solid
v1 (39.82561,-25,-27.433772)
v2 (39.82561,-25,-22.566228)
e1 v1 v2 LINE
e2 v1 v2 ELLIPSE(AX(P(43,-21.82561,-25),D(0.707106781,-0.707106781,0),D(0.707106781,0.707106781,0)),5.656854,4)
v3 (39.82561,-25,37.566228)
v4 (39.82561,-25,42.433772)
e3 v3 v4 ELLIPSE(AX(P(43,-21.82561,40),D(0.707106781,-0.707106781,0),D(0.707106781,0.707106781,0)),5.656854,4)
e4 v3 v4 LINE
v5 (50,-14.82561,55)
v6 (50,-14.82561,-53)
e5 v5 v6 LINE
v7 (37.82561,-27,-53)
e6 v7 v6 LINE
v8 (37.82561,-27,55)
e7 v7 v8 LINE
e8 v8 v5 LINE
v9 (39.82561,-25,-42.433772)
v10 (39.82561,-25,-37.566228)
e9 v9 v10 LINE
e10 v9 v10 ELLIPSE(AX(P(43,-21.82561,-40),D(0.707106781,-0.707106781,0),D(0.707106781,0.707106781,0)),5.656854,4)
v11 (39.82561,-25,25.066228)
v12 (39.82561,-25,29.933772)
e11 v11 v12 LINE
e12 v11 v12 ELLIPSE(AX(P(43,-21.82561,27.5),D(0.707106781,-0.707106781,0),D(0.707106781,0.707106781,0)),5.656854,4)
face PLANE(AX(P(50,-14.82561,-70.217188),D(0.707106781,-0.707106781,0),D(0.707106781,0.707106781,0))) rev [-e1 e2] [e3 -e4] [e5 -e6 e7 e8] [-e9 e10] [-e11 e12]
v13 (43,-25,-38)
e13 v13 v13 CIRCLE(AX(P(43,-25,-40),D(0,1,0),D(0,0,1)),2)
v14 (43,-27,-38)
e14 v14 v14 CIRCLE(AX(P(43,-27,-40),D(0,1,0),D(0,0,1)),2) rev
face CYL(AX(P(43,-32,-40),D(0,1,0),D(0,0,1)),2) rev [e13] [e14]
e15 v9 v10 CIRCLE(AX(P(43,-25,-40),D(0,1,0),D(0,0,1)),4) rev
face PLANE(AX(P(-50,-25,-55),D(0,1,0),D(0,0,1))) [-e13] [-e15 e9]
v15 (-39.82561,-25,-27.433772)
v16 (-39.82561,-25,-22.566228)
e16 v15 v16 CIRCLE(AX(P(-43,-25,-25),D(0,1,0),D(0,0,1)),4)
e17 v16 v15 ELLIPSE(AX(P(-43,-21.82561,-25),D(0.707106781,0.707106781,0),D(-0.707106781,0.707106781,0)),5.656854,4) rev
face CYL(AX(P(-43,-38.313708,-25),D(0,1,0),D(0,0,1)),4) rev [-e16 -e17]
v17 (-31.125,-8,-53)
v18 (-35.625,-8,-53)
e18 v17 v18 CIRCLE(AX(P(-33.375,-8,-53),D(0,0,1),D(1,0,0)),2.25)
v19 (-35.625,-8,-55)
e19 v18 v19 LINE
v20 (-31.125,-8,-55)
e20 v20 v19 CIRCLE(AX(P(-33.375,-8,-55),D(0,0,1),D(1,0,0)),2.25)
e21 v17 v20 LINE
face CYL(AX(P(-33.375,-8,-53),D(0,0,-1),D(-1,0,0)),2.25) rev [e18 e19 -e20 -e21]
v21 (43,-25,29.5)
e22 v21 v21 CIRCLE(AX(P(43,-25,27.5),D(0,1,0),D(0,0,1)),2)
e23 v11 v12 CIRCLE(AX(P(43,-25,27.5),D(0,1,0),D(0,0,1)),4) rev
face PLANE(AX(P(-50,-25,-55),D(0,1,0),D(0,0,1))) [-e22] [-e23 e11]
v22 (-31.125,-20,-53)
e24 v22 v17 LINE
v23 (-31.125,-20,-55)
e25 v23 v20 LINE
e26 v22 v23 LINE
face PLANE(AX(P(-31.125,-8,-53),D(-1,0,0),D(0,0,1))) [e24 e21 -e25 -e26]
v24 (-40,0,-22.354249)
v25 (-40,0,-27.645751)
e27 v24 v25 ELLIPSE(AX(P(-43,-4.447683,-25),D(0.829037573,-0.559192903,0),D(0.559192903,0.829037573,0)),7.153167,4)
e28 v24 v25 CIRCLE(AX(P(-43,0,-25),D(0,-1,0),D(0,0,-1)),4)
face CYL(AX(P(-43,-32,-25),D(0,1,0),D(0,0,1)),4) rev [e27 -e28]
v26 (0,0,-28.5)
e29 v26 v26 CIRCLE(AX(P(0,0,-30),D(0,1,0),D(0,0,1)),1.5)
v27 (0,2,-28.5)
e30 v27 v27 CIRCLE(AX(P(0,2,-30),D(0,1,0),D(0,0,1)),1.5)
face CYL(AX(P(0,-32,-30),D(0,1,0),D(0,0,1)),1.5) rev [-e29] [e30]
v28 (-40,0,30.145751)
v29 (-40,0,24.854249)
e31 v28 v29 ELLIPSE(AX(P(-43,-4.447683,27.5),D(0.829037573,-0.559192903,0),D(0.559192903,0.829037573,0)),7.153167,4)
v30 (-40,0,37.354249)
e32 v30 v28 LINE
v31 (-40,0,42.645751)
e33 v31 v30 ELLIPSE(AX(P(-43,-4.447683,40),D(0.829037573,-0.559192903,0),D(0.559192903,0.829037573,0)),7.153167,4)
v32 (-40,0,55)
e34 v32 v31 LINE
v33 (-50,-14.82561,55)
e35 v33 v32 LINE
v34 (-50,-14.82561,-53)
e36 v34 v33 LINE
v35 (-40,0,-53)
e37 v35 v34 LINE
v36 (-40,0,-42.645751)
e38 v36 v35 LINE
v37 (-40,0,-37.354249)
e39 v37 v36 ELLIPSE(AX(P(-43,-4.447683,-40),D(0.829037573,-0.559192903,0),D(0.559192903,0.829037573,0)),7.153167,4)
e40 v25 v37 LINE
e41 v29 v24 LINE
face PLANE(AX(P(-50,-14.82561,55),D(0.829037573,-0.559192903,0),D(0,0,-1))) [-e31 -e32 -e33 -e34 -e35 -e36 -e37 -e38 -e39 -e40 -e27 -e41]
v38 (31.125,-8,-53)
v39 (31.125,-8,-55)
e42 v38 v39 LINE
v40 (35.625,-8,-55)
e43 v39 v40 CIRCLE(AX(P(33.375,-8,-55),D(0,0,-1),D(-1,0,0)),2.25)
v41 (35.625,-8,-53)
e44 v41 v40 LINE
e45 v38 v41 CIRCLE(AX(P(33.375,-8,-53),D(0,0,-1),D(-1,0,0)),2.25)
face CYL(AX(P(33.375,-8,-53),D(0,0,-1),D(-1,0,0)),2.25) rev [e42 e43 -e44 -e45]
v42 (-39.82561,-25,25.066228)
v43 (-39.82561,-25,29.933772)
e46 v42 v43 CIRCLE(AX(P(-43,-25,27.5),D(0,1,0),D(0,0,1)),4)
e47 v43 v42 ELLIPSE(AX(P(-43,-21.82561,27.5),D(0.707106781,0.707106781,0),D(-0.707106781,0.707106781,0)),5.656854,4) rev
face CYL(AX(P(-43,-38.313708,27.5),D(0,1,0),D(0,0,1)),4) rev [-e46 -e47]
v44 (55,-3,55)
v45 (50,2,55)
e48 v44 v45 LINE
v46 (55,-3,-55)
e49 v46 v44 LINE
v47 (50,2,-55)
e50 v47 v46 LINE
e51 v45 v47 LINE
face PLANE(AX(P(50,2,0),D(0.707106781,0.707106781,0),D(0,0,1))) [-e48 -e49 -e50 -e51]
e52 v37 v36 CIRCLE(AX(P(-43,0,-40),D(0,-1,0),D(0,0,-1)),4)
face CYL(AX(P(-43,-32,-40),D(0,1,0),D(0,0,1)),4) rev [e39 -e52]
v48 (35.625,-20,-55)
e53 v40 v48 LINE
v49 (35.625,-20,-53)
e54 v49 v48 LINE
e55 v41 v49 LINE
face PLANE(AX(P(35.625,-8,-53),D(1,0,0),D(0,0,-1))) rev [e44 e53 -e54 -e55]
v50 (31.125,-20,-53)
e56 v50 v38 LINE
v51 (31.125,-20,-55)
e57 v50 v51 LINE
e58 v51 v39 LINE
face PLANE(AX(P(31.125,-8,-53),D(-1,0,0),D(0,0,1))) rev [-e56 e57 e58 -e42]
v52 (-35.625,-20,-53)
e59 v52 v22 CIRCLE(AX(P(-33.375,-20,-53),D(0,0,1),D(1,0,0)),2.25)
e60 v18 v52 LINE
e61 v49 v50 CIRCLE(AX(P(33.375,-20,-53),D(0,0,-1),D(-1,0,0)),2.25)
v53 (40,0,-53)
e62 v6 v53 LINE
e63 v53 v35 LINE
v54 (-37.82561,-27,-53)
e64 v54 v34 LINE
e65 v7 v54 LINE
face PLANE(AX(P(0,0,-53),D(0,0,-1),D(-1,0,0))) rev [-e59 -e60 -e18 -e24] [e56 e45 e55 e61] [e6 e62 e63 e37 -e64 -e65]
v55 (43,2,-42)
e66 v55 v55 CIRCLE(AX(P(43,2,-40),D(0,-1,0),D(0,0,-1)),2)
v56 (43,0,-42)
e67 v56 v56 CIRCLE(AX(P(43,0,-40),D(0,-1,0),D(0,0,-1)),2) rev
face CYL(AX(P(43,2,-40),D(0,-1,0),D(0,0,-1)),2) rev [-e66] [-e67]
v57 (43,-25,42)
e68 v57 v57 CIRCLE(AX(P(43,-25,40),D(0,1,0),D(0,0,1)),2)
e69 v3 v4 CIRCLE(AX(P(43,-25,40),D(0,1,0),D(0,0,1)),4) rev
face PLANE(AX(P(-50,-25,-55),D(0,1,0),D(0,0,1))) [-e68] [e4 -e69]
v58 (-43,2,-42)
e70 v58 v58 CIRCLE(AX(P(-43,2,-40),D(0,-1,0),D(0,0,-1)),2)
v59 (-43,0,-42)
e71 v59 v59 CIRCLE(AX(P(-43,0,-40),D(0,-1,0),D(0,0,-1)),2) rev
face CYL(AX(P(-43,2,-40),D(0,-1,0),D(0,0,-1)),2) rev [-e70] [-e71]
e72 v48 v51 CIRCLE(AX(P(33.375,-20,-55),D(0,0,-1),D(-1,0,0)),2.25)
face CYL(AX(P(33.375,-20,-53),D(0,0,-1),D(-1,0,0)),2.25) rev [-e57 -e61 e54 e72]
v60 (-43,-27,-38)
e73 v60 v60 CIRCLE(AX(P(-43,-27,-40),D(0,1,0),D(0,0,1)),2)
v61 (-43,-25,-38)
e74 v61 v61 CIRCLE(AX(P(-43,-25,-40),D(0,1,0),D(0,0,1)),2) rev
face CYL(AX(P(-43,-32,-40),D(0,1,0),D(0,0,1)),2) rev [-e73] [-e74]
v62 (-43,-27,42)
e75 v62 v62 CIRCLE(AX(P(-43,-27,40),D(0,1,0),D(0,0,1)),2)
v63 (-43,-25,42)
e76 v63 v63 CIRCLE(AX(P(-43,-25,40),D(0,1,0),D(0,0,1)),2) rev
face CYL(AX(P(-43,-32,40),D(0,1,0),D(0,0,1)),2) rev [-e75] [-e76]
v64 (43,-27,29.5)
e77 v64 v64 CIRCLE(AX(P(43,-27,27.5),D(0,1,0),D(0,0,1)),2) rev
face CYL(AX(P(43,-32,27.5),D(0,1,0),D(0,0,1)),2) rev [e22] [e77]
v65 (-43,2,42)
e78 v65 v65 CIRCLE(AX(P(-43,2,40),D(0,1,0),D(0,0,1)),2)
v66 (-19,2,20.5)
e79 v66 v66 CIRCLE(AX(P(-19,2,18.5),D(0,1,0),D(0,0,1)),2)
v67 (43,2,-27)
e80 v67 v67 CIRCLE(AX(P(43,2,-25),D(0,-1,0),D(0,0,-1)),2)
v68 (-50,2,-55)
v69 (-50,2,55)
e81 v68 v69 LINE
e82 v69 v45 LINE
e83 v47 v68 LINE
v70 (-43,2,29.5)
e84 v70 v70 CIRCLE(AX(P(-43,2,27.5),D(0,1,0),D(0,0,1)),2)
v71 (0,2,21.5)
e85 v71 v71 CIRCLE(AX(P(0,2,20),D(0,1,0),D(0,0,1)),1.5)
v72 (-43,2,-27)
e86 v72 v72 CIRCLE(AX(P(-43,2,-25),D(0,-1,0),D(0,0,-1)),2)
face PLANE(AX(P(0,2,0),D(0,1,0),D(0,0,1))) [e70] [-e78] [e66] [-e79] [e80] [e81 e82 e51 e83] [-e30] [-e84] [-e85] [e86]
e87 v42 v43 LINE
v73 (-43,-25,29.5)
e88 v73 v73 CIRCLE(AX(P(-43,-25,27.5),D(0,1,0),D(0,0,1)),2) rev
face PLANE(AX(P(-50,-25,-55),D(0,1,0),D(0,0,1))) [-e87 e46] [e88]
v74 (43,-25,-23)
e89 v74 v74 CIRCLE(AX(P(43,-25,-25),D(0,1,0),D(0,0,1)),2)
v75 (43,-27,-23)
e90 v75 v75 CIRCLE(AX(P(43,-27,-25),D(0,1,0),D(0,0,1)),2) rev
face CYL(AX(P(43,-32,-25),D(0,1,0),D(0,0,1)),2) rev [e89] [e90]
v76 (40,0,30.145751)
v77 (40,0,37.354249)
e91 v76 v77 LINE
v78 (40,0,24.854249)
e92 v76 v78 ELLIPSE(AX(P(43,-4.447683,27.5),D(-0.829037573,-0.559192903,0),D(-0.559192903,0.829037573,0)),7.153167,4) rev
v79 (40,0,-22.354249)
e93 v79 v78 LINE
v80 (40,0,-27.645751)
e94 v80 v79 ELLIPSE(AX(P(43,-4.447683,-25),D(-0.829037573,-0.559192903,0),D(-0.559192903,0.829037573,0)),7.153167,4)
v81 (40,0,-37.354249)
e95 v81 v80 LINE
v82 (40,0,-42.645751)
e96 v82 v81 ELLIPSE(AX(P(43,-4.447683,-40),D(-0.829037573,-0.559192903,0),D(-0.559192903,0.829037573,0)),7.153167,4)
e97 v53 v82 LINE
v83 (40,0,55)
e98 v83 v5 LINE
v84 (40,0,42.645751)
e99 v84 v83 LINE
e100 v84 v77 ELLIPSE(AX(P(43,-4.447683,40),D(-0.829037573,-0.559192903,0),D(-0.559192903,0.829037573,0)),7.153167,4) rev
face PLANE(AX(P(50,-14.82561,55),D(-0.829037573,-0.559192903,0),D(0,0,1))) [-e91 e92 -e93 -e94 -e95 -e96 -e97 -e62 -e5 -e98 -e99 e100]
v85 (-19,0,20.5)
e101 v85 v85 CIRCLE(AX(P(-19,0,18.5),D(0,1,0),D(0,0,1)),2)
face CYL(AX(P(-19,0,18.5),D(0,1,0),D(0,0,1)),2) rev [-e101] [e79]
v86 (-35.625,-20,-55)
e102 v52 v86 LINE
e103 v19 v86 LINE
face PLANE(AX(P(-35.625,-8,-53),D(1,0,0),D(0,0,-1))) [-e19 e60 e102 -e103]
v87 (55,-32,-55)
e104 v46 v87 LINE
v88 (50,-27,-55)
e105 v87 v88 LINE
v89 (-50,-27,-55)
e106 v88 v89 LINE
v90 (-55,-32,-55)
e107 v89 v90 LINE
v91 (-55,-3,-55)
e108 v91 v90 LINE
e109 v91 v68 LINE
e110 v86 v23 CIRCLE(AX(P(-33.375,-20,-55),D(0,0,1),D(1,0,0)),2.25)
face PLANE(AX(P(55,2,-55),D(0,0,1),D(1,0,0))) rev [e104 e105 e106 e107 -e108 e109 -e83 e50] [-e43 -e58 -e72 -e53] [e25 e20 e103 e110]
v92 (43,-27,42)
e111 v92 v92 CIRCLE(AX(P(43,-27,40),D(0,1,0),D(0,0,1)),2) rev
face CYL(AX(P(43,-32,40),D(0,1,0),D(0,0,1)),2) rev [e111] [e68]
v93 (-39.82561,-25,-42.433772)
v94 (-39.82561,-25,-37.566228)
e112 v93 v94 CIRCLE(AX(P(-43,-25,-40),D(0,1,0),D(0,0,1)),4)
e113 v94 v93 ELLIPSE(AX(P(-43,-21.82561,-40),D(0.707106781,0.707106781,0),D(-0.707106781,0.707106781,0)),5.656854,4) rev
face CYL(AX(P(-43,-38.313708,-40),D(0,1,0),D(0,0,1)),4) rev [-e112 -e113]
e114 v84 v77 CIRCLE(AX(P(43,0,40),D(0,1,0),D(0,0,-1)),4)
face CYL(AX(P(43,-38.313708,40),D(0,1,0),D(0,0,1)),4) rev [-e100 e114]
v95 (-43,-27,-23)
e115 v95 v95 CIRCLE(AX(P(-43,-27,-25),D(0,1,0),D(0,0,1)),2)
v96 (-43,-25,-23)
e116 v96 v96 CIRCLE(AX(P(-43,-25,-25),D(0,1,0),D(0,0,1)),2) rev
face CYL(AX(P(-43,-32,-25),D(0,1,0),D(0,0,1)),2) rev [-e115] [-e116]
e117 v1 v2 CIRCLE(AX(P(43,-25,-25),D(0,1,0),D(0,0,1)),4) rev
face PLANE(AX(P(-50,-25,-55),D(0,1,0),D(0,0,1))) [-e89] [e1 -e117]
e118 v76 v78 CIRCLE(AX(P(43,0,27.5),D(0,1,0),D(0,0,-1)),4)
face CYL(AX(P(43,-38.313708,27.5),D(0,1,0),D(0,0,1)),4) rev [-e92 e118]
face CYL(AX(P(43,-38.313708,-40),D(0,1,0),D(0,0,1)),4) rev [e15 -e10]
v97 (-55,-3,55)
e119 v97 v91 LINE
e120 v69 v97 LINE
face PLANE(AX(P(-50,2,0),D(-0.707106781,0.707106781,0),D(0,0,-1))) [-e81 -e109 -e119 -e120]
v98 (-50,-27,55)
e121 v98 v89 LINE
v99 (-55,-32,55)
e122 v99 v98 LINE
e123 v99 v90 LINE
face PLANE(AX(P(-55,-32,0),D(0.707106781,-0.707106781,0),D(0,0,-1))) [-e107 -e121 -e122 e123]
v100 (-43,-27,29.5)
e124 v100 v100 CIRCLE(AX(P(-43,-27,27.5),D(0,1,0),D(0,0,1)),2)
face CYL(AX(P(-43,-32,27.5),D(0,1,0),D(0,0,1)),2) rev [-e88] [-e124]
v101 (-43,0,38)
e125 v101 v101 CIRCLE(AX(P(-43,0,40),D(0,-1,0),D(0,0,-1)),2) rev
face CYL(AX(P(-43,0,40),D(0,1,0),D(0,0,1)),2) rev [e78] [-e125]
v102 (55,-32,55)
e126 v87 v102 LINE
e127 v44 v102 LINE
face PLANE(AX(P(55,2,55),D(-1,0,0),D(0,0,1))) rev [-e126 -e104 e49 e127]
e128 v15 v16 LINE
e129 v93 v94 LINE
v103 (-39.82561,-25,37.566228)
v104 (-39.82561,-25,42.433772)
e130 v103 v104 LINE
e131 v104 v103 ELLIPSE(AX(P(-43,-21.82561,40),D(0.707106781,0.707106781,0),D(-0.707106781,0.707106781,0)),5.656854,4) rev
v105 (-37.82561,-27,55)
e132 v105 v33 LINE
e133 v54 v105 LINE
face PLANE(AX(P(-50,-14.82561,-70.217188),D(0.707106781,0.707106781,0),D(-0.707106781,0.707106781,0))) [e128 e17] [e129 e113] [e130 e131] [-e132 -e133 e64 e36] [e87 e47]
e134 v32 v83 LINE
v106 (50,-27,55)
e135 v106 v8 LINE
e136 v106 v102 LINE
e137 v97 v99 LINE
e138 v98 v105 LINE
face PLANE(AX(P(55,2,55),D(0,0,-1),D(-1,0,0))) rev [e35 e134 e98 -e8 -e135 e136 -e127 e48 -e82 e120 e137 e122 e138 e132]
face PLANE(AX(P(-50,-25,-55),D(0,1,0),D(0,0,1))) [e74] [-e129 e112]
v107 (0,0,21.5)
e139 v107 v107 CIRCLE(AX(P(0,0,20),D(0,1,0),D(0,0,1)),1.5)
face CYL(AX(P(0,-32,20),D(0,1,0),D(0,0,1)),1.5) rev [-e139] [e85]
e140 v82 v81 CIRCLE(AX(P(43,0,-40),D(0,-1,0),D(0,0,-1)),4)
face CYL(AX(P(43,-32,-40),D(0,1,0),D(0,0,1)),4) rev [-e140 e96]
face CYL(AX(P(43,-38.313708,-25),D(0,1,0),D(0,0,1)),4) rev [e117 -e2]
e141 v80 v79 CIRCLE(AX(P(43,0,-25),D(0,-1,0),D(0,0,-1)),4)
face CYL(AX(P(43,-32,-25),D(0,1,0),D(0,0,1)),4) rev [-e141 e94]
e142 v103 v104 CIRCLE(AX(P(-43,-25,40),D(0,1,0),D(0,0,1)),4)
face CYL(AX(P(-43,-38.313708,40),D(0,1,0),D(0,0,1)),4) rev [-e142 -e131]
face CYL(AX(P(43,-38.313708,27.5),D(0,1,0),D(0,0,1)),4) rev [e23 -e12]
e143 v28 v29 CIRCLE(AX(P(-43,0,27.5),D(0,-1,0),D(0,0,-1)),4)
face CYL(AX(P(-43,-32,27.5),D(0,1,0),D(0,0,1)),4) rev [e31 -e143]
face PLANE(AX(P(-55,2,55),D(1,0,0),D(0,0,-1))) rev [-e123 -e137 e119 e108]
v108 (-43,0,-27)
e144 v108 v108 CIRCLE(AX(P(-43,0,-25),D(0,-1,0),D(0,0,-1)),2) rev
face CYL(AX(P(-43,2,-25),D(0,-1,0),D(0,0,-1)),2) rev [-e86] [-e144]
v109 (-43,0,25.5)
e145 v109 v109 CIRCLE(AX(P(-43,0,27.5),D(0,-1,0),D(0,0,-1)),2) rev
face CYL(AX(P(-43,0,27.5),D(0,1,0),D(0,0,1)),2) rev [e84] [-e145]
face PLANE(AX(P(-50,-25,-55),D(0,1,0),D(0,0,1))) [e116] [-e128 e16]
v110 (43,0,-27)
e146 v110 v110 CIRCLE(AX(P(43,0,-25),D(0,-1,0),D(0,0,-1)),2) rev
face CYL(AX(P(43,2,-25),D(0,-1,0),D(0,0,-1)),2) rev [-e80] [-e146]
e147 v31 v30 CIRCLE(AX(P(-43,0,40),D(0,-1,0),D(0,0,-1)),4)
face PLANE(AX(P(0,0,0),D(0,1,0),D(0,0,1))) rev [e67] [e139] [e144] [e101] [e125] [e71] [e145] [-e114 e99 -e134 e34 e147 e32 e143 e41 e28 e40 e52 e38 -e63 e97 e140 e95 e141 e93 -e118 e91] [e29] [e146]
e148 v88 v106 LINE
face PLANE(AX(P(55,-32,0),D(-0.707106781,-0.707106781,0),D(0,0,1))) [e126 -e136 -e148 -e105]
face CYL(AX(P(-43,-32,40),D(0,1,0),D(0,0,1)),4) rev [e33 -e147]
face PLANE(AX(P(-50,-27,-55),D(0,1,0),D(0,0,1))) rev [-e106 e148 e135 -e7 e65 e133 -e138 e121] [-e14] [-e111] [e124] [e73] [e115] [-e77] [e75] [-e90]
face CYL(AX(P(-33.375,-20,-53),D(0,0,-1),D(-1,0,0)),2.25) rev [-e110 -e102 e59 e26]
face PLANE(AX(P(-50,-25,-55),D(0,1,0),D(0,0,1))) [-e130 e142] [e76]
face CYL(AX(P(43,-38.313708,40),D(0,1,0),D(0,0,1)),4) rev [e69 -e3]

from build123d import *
from build123d.topology import SkipClean

# Parameters (mm, degrees)
SKETCH1_W           = 110
SKETCH1_H           = 110
BOSS_EXTRUDE1_DEPTH = 2
SKETCH2_R           = 2
CUT_EXTRUDE1_DEPTH  = 78.807454656
SKETCH3_W           = 5
SKETCH3_H           = 110
BOSS_EXTRUDE2_DEPTH = 32
SKETCH4_R           = 1.5
CUT_EXTRUDE2_DEPTH  = 85.888161719
SKETCH5_R           = 2
CUT_EXTRUDE3_DEPTH  = 85.107074613
CHAMFER1_SIZE       = 14.825609685
CHAMFER1_SIZE_2     = 10
SKETCH6_R           = 4
CUT_EXTRUDE4_DEPTH  = 85.107074613
CHAMFER2_SIZE       = 5
BOSS_EXTRUDE3_DEPTH = 2
CUT_EXTRUDE5_DEPTH  = 2
CHAMFER3_SIZE       = 5
CUT_EXTRUDE6_DEPTH  = 2
BOSS_EXTRUDE4_DEPTH = 108
SKETCH12_R          = 2
CUT_EXTRUDE7_DEPTH  = 85.107074613
SKETCH13_R          = 4
CUT_EXTRUDE8_DEPTH  = 25


# Some blends are built 0.0001 mm under size
with BuildPart() as part:
    # Sketch1 → Boss-Extrude1 (new body)
    with BuildSketch(Plane(origin=(0, 0, 0), x_dir=(1, 0, 0), z_dir=(0, 1, 0))):
        Rectangle(SKETCH1_W, SKETCH1_H)
    extrude(amount=BOSS_EXTRUDE1_DEPTH)

    # Sketch2 → Cut-Extrude1 (cut, through all)
    with BuildSketch(Plane(origin=(0, 2, 0), x_dir=(1, 0, 0), z_dir=(0, 1, 0))):
        with Locations(Location((-43, -40, 0), (0, 0, 270))):
            Circle(SKETCH2_R)
        with Locations(Location((-43, -27.5, 0), (0, 0, 270))):
            Circle(SKETCH2_R)
        with Locations(Location((-19, -18.5, 0), (0, 0, 270))):
            Circle(SKETCH2_R)
    extrude(amount=-CUT_EXTRUDE1_DEPTH, mode=Mode.SUBTRACT)

    # Sketch3 → Boss-Extrude2 (add)
    with BuildSketch(Plane.XZ):
        with Locations((-52.5, 0)):
            Rectangle(SKETCH3_W, SKETCH3_H)
        with Locations((52.5, 0)):
            Rectangle(SKETCH3_W, SKETCH3_H)
    extrude(amount=BOSS_EXTRUDE2_DEPTH)

    # Sketch4 → Cut-Extrude2 (cut, through all)
    with BuildSketch(Plane(origin=(0, 2, 0), x_dir=(1, 0, 0), z_dir=(0, 1, 0))):
        with Locations(Location((0, 30, 0), (0, 0, 270))):
            Circle(SKETCH4_R)
        with Locations(Location((0, -20, 0), (0, 0, 270))):
            Circle(SKETCH4_R)
    extrude(amount=-CUT_EXTRUDE2_DEPTH, mode=Mode.SUBTRACT)

    # Sketch5 → Cut-Extrude3 (cut, through all)
    with BuildSketch(Plane.XZ):
        with Locations(Location((-43, -25, 0), (0, 0, 270))):
            Circle(SKETCH5_R)
        with Locations(Location((-43, -40, 0), (0, 0, 270))):
            Circle(SKETCH5_R)
        with Locations(Location((43, -25, 0), (0, 0, 270))):
            Circle(SKETCH5_R)
        with Locations(Location((43, -40, 0), (0, 0, 270))):
            Circle(SKETCH5_R)
    extrude(amount=-CUT_EXTRUDE3_DEPTH, mode=Mode.SUBTRACT)

    # Chamfer1
    # the kernel refuses this chamfer: 14.825609685, 10 mm, written as the material it adds along each edge
    with BuildSketch(Plane(origin=(-50, 0, 55), x_dir=(-0.021644705014774085, -0.9997657259302418, 0), z_dir=(0, 0, -1))) as chamfer1_piece_1_section:
        Polygon((CHAMFER1_SIZE * 0.999765725939, -CHAMFER1_SIZE * 0.021644705015), (-CHAMFER1_SIZE_2 * 0.0216447050148, -CHAMFER1_SIZE_2 * 0.99976572593), (0, 0), align=None)
    chamfer1_piece_1 = extrude(amount=110, mode=Mode.PRIVATE)
    chamfer1_piece_1 = chamfer1_piece_1 - Plane(origin=(-43, -5.019728398, 40), x_dir=(0, 0, 1), z_dir=(0, 1, 0)) * Cylinder(2, 280, mode=Mode.PRIVATE)
    chamfer1_piece_1 = chamfer1_piece_1 - Plane(origin=(-43, -5.019728398, 27.5), x_dir=(0, 0, 1), z_dir=(0, 1, 0)) * Cylinder(2, 280, mode=Mode.PRIVATE)
    chamfer1_piece_1 = chamfer1_piece_1 - Plane(origin=(-43, -5.019728398, -25), x_dir=(0, 0, -1), z_dir=(0, -1, 0)) * Cylinder(2, 280, mode=Mode.PRIVATE)
    chamfer1_piece_1 = chamfer1_piece_1 - Plane(origin=(-43, -5.019728398, -40), x_dir=(0, 0, -1), z_dir=(0, -1, 0)) * Cylinder(2, 280, mode=Mode.PRIVATE)
    add(chamfer1_piece_1)
    with BuildSketch(Plane(origin=(50, 0, 55), x_dir=(-0.9988697089125116, 0.04753214298802855, 0), z_dir=(0, 0, -1))) as chamfer1_piece_2_section:
        Polygon((CHAMFER1_SIZE_2 * 0.998869708913, -CHAMFER1_SIZE_2 * 0.047532142988), (-CHAMFER1_SIZE * 0.0475321429884, -CHAMFER1_SIZE * 0.998869708921), (0, 0), align=None)
    chamfer1_piece_2 = extrude(amount=110, mode=Mode.PRIVATE)
    chamfer1_piece_2 = chamfer1_piece_2 - Plane(origin=(43, -4.982049295, -25), x_dir=(0, 0, -1), z_dir=(0, -1, 0)) * Cylinder(2, 280, mode=Mode.PRIVATE)
    chamfer1_piece_2 = chamfer1_piece_2 - Plane(origin=(43, -4.982049295, -40), x_dir=(0, 0, -1), z_dir=(0, -1, 0)) * Cylinder(2, 280, mode=Mode.PRIVATE)
    add(chamfer1_piece_2)

    # Sketch6 → Cut-Extrude4 (cut, through all)
    with BuildSketch(Plane.XZ):
        with Locations((-43, 40)):
            Circle(SKETCH6_R)
        with Locations((-43, 27.5)):
            Circle(SKETCH6_R)
        with Locations((-43, -25)):
            Circle(SKETCH6_R)
        with Locations((-43, -40)):
            Circle(SKETCH6_R)
        with Locations((43, -25)):
            Circle(SKETCH6_R)
        with Locations((43, -40)):
            Circle(SKETCH6_R)
    extrude(amount=CUT_EXTRUDE4_DEPTH, mode=Mode.SUBTRACT)

    # Chamfer2
    chamfer2_edges = [part.edges().sort_by_distance(p)[0] for p in [
        (55, 2, 0),
        (-55, 2, 0),
    ]]
    chamfer(chamfer2_edges, length=CHAMFER2_SIZE)

    # Sketch8 → Boss-Extrude3 (add)
    with BuildSketch(Plane(origin=(0, 0, -55), x_dir=(-1, 0, 0), z_dir=(0, 0, -1))):
        Polygon((-55, -32), (55, -32), (55, -3), (50, 2), (-50, 2), (-55, -3), align=None)
    extrude(amount=-BOSS_EXTRUDE3_DEPTH)

    # Sketch9 → Cut-Extrude5 (cut)
    with BuildSketch(Plane(origin=(0, 0, -55), x_dir=(-1, 0, 0), z_dir=(0, 0, -1))):
        with BuildLine():
            Line((-31.125, -8), (-31.125, -20))
            ThreePointArc((-31.125, -20), (-33.375, -22.25), (-35.625, -20))
            Line((-35.625, -20), (-35.625, -8))
            ThreePointArc((-35.625, -8), (-33.375, -5.75), (-31.125, -8))
        make_face()
    cut_extrude5 = extrude(amount=-CUT_EXTRUDE5_DEPTH, mode=Mode.SUBTRACT)

    # Mirror1: Cut-Extrude5 across plane
    add(cut_extrude5.mirror(Plane(origin=(0, 0, 0), x_dir=(0, 0, 1), z_dir=(1, 0, 0))), mode=Mode.SUBTRACT)

    # Chamfer3
    chamfer3_edges = [part.edges().sort_by_distance(p)[0] for p in [
        (50, -32, 1),
        (-50, -32, 1),
    ]]
    chamfer(chamfer3_edges, length=CHAMFER3_SIZE - 0.0001)  # a hair under: the kernel refuses the full size

    # Sketch10 → Cut-Extrude6 (cut)
    with SkipClean():  # the faces are left unmerged after this step: merging them gives an invalid solid
        with BuildSketch(Plane.XY.offset(-53)):
            Polygon((-50, -27), (50, -27), (55, -32), (-55, -32), align=None)
        extrude(amount=-CUT_EXTRUDE6_DEPTH, mode=Mode.SUBTRACT)

    # Sketch11 → Boss-Extrude4 (add)
    with SkipClean():  # the faces are left unmerged after this step: merging them gives an invalid solid
        with BuildSketch(Plane.XY.offset(55)):
            Polygon((-50, -14.825609685), (-37.825609685, -27), (-50, -27), align=None)
        boss_extrude4 = extrude(amount=-BOSS_EXTRUDE4_DEPTH)

    # Sketch12 → Cut-Extrude7 (cut, through all)
    with SkipClean():  # the faces are left unmerged after this step: merging them gives an invalid solid
        with BuildSketch(Plane(origin=(0, 0, 0), x_dir=(1, 0, 0), z_dir=(0, 1, 0))):
            with Locations(Location((-43, -40, 0), (0, 0, 270))):
                Circle(SKETCH12_R)
            with Locations(Location((-43, -27.5, 0), (0, 0, 270))):
                Circle(SKETCH12_R)
            with Locations(Location((-43, 25, 0), (0, 0, 90))):
                Circle(SKETCH12_R)
            with Locations(Location((-43, 40, 0), (0, 0, 90))):
                Circle(SKETCH12_R)
        cut_extrude7 = extrude(amount=-CUT_EXTRUDE7_DEPTH, mode=Mode.SUBTRACT)

    # Sketch13 → Cut-Extrude8 (cut)
    with SkipClean():  # the faces are left unmerged after this step: merging them gives an invalid solid
        with BuildSketch(Plane.XZ):
            with Locations((-43, 40)):
                Circle(SKETCH13_R)
            with Locations((-43, 27.5)):
                Circle(SKETCH13_R)
            with Locations((-43, -25)):
                Circle(SKETCH13_R)
            with Locations((-43, -40)):
                Circle(SKETCH13_R)
        cut_extrude8 = extrude(amount=CUT_EXTRUDE8_DEPTH, mode=Mode.SUBTRACT)

    # Mirror2: Boss-Extrude4, Cut-Extrude7, Cut-Extrude8 across plane
    with SkipClean():  # the faces are left unmerged after this step: merging them gives an invalid solid
        add(boss_extrude4.mirror(Plane(origin=(0, 0, 0), x_dir=(0, 0, 1), z_dir=(1, 0, 0))))
        add(cut_extrude7.mirror(Plane(origin=(0, 0, 0), x_dir=(0, 0, 1), z_dir=(1, 0, 0))), mode=Mode.SUBTRACT)
        add(cut_extrude8.mirror(Plane(origin=(0, 0, 0), x_dir=(0, 0, 1), z_dir=(1, 0, 0))), mode=Mode.SUBTRACT)


solid = part.part
